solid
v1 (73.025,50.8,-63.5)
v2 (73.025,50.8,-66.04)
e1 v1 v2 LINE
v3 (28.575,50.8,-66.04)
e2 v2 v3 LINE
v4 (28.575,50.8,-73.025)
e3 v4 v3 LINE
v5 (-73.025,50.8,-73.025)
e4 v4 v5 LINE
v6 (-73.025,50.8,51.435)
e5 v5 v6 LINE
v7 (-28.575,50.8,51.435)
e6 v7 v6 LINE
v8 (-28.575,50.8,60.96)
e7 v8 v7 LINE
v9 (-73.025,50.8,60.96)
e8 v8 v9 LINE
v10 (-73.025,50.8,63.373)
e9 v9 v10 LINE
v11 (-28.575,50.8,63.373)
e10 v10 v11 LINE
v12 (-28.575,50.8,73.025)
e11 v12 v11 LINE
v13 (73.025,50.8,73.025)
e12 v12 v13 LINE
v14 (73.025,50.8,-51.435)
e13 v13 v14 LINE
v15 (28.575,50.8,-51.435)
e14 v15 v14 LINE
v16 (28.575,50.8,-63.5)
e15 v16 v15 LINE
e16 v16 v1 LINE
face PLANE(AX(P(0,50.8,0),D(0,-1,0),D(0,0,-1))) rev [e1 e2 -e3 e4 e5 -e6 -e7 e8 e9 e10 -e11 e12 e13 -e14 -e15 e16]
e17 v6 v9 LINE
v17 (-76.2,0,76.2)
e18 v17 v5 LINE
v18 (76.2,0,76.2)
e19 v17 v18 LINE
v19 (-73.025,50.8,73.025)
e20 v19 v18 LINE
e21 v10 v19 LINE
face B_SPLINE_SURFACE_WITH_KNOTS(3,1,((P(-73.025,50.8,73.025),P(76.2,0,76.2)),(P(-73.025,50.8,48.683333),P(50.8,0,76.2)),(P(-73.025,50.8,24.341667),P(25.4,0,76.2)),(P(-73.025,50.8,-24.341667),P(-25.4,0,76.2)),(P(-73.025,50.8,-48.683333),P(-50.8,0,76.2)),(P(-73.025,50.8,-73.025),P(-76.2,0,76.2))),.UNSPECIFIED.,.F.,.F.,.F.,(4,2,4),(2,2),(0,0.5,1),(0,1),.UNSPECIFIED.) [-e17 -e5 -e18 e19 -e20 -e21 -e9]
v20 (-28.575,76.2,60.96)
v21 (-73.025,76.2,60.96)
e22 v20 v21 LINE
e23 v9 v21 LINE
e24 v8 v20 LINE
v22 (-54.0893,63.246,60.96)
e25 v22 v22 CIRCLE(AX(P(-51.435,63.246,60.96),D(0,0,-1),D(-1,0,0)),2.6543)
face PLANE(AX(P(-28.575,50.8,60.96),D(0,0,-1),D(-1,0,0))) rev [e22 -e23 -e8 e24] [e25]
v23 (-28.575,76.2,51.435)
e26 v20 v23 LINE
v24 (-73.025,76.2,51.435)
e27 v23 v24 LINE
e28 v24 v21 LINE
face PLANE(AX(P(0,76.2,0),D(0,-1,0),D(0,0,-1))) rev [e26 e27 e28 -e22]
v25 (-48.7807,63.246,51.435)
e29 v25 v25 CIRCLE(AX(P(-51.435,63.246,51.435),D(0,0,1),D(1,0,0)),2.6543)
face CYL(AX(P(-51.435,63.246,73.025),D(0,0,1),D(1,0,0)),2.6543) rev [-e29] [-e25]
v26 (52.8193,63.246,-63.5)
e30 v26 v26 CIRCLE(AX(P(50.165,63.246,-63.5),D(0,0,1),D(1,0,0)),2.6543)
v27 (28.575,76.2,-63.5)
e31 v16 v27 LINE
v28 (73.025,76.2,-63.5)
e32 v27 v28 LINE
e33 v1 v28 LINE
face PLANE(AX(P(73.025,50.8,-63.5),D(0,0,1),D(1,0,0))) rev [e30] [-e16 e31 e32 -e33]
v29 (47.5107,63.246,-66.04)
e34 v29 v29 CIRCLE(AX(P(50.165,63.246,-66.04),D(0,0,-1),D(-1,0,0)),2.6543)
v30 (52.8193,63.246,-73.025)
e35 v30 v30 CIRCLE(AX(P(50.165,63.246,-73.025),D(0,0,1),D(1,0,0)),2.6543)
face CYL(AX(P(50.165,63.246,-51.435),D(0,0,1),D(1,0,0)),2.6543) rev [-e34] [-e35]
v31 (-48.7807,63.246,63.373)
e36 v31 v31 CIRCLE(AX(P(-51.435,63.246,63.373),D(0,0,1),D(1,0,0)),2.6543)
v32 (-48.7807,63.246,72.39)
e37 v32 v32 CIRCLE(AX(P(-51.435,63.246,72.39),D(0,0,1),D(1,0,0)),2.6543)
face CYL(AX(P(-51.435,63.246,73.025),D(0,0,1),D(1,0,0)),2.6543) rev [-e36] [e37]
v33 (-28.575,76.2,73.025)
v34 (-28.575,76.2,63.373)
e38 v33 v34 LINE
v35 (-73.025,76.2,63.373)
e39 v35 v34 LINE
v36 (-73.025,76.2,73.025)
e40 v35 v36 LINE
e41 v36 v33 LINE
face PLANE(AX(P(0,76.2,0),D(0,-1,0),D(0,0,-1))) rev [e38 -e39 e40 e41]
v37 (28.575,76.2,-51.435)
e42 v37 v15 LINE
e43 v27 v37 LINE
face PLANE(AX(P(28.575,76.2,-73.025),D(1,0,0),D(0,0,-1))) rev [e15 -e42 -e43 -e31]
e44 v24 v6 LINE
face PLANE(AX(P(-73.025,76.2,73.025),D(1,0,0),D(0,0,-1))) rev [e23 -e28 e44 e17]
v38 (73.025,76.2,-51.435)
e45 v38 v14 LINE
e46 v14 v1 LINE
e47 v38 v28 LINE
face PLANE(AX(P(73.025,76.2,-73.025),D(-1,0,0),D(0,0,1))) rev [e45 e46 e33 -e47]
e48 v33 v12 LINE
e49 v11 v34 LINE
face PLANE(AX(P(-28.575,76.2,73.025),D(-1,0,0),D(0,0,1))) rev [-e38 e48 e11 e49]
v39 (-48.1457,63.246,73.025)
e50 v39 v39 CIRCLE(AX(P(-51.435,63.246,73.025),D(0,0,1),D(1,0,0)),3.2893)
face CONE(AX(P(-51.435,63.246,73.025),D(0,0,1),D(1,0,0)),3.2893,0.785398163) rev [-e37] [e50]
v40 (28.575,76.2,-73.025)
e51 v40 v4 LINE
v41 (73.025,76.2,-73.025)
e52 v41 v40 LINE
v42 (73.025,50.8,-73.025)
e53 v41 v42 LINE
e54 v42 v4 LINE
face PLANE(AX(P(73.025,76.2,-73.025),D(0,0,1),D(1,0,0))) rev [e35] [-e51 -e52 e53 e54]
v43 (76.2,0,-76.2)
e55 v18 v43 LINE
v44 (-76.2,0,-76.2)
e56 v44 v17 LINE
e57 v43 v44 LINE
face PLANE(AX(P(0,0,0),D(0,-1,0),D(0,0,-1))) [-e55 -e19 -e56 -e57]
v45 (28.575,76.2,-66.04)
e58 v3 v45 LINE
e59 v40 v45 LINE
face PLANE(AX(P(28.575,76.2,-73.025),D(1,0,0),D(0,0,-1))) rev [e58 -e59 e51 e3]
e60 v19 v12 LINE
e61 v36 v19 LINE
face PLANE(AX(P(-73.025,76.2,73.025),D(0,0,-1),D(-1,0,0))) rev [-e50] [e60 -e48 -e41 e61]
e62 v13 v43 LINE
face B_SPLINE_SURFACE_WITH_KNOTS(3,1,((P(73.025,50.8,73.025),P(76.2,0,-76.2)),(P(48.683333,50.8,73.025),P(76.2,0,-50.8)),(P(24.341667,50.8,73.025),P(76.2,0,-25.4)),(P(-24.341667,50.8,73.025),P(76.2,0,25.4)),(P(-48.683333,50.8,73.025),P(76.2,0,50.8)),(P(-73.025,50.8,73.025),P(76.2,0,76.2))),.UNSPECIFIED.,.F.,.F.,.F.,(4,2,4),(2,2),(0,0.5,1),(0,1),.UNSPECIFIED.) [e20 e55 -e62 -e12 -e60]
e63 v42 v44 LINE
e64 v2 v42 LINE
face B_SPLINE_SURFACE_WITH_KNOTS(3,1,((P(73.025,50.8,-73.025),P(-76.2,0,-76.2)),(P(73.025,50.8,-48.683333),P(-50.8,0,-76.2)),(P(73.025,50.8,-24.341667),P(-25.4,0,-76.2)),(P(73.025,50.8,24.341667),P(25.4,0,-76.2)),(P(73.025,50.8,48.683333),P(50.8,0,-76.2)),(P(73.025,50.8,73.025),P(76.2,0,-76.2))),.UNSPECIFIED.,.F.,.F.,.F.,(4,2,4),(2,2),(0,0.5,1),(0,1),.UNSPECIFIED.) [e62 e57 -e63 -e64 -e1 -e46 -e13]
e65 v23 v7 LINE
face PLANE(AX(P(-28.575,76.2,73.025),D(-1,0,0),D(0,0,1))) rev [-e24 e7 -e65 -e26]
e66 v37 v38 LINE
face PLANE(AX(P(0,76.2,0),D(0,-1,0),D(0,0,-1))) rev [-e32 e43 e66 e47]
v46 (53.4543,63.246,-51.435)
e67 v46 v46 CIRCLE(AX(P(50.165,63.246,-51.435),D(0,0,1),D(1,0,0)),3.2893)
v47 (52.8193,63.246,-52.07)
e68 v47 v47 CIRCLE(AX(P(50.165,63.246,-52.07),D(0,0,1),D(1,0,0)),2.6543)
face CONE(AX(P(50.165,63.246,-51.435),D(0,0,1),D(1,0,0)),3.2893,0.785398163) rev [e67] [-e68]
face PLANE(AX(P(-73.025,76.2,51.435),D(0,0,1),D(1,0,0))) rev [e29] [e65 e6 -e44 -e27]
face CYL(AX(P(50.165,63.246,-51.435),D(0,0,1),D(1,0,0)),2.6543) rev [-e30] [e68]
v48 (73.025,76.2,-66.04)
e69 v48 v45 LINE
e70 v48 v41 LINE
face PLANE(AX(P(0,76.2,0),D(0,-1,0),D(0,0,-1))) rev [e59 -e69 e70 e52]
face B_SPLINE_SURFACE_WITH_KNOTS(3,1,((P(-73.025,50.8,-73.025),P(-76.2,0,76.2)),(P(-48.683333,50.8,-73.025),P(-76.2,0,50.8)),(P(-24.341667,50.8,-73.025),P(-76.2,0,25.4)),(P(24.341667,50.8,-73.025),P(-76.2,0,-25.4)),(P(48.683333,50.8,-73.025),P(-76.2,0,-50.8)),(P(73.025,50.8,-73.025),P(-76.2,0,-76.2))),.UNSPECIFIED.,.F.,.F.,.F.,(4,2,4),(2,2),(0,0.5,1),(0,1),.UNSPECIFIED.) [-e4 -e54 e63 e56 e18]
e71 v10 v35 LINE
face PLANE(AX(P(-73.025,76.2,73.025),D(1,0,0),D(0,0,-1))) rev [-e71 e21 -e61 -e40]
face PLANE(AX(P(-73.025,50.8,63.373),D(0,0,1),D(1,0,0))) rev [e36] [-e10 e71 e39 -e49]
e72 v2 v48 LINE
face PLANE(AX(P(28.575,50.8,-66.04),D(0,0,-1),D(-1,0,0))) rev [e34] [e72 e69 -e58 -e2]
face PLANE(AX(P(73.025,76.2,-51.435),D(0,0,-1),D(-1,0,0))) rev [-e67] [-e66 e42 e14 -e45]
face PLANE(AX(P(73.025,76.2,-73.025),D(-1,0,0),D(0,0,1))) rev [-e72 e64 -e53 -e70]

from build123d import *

# Parameters (mm, degrees)
SKETCH20_W                           = 44.45
SKETCH20_H                           = 21.59
BOSS_EXTRUDE3_DEPTH                  = 25.4
SKETCH22_W                           = 44.45
SKETCH22_H                           = 2.413
CUT_EXTRUDE2_DEPTH                   = 25.4
SKETCH23_W                           = 44.45
SKETCH23_H                           = 2.54
CUT_EXTRUDE3_DEPTH                   = 25.4
F_4_0_209_DIAMETER_HOLE6_D           = 5.3086
F_4_0_209_DIAMETER_HOLE6_CSINK_D     = 6.5786
F_4_0_209_DIAMETER_HOLE6_CSINK_ANGLE = 90
F_4_0_209_DIAMETER_HOLE7_D           = 5.3086
F_4_0_209_DIAMETER_HOLE7_CSINK_D     = 6.5786
F_4_0_209_DIAMETER_HOLE7_CSINK_ANGLE = 90


with BuildPart() as part:
    # Loft1: read off the stored shape, not the designer's step
    # Loft1: loft between two sections, ruled curve by curve
    loft1_from = [
        Edge.make_bspline([(-73.025, 50.8, -73.025), (-48.683333333, 50.8, -73.025), (-24.341666667, 50.8, -73.025), (24.341666667, 50.8, -73.025), (48.683333333, 50.8, -73.025), (73.025, 50.8, -73.025)], [0, 0, 0, 0, 0.5, 0.5, 1, 1, 1, 1], 3),
        Edge.make_bspline([(73.025, 50.8, -73.025), (73.025, 50.8, -48.683333333), (73.025, 50.8, -24.341666667), (73.025, 50.8, 24.341666667), (73.025, 50.8, 48.683333333), (73.025, 50.8, 73.025)], [0, 0, 0, 0, 0.5, 0.5, 1, 1, 1, 1], 3),
        Edge.make_bspline([(-73.025, 50.8, 73.025), (-73.025, 50.8, 48.683333333), (-73.025, 50.8, 24.341666667), (-73.025, 50.8, -24.341666667), (-73.025, 50.8, -48.683333333), (-73.025, 50.8, -73.025)], [0, 0, 0, 0, 0.5, 0.5, 1, 1, 1, 1], 3),
        Edge.make_bspline([(73.025, 50.8, 73.025), (48.683333333, 50.8, 73.025), (24.341666667, 50.8, 73.025), (-24.341666667, 50.8, 73.025), (-48.683333333, 50.8, 73.025), (-73.025, 50.8, 73.025)], [0, 0, 0, 0, 0.5, 0.5, 1, 1, 1, 1], 3),
    ]
    loft1_to = [
        Edge.make_bspline([(-76.2, 0, 76.2), (-76.2, 0, 50.8), (-76.2, 0, 25.4), (-76.2, 0, -25.4), (-76.2, 0, -50.8), (-76.2, 0, -76.2)], [0, 0, 0, 0, 0.5, 0.5, 1, 1, 1, 1], 3),
        Edge.make_bspline([(-76.2, 0, -76.2), (-50.8, 0, -76.2), (-25.4, 0, -76.2), (25.4, 0, -76.2), (50.8, 0, -76.2), (76.2, 0, -76.2)], [0, 0, 0, 0, 0.5, 0.5, 1, 1, 1, 1], 3),
        Edge.make_bspline([(76.2, 0, 76.2), (50.8, 0, 76.2), (25.4, 0, 76.2), (-25.4, 0, 76.2), (-50.8, 0, 76.2), (-76.2, 0, 76.2)], [0, 0, 0, 0, 0.5, 0.5, 1, 1, 1, 1], 3),
        Edge.make_bspline([(76.2, 0, -76.2), (76.2, 0, -50.8), (76.2, 0, -25.4), (76.2, 0, 25.4), (76.2, 0, 50.8), (76.2, 0, 76.2)], [0, 0, 0, 0, 0.5, 0.5, 1, 1, 1, 1], 3),
    ]
    loft1 = Solid(Shell([*[Face.make_surface_from_curves(loft1_from[k], loft1_to[k]) for k in range(4)], Face(Wire(loft1_from)), Face(Wire(loft1_to))]))
    add(loft1)

    # Sketch20 → Boss-Extrude3 (add)
    with BuildSketch(Plane(origin=(0, 50.8, 0), x_dir=(1, 0, 0), z_dir=(0, 1, 0))):
        with Locations((-50.8, -62.23)):
            Rectangle(SKETCH20_W, SKETCH20_H)
        with Locations((50.8, 62.23)):
            Rectangle(SKETCH20_W, SKETCH20_H)
    extrude(amount=BOSS_EXTRUDE3_DEPTH)

    # Sketch22 → Cut-Extrude2 (cut)
    with BuildSketch(Plane(origin=(0, 76.2, 0), x_dir=(1, 0, 0), z_dir=(0, 1, 0))):
        with Locations((-50.8, -62.1665)):
            Rectangle(SKETCH22_W, SKETCH22_H)
    extrude(amount=-CUT_EXTRUDE2_DEPTH, mode=Mode.SUBTRACT)

    # Sketch23 → Cut-Extrude3 (cut)
    with BuildSketch(Plane(origin=(0, 76.2, 0), x_dir=(1, 0, 0), z_dir=(0, 1, 0))):
        with Locations((50.8, 64.77)):
            Rectangle(SKETCH23_W, SKETCH23_H)
    extrude(amount=-CUT_EXTRUDE3_DEPTH, mode=Mode.SUBTRACT)

    # #4 (0.209) Diameter Hole6 (through all)
    with Locations(Plane.XY.offset(73.025)):
        with Locations((-51.435, 63.246)):
            CounterSinkHole(F_4_0_209_DIAMETER_HOLE6_D / 2, F_4_0_209_DIAMETER_HOLE6_CSINK_D / 2, counter_sink_angle=F_4_0_209_DIAMETER_HOLE6_CSINK_ANGLE)

    # #4 (0.209) Diameter Hole7 (through all)
    with Locations(Plane.XY.offset(-51.435)):
        with Locations((50.165, 63.246)):
            CounterSinkHole(F_4_0_209_DIAMETER_HOLE7_D / 2, F_4_0_209_DIAMETER_HOLE7_CSINK_D / 2, counter_sink_angle=F_4_0_209_DIAMETER_HOLE7_CSINK_ANGLE)


solid = part.part
